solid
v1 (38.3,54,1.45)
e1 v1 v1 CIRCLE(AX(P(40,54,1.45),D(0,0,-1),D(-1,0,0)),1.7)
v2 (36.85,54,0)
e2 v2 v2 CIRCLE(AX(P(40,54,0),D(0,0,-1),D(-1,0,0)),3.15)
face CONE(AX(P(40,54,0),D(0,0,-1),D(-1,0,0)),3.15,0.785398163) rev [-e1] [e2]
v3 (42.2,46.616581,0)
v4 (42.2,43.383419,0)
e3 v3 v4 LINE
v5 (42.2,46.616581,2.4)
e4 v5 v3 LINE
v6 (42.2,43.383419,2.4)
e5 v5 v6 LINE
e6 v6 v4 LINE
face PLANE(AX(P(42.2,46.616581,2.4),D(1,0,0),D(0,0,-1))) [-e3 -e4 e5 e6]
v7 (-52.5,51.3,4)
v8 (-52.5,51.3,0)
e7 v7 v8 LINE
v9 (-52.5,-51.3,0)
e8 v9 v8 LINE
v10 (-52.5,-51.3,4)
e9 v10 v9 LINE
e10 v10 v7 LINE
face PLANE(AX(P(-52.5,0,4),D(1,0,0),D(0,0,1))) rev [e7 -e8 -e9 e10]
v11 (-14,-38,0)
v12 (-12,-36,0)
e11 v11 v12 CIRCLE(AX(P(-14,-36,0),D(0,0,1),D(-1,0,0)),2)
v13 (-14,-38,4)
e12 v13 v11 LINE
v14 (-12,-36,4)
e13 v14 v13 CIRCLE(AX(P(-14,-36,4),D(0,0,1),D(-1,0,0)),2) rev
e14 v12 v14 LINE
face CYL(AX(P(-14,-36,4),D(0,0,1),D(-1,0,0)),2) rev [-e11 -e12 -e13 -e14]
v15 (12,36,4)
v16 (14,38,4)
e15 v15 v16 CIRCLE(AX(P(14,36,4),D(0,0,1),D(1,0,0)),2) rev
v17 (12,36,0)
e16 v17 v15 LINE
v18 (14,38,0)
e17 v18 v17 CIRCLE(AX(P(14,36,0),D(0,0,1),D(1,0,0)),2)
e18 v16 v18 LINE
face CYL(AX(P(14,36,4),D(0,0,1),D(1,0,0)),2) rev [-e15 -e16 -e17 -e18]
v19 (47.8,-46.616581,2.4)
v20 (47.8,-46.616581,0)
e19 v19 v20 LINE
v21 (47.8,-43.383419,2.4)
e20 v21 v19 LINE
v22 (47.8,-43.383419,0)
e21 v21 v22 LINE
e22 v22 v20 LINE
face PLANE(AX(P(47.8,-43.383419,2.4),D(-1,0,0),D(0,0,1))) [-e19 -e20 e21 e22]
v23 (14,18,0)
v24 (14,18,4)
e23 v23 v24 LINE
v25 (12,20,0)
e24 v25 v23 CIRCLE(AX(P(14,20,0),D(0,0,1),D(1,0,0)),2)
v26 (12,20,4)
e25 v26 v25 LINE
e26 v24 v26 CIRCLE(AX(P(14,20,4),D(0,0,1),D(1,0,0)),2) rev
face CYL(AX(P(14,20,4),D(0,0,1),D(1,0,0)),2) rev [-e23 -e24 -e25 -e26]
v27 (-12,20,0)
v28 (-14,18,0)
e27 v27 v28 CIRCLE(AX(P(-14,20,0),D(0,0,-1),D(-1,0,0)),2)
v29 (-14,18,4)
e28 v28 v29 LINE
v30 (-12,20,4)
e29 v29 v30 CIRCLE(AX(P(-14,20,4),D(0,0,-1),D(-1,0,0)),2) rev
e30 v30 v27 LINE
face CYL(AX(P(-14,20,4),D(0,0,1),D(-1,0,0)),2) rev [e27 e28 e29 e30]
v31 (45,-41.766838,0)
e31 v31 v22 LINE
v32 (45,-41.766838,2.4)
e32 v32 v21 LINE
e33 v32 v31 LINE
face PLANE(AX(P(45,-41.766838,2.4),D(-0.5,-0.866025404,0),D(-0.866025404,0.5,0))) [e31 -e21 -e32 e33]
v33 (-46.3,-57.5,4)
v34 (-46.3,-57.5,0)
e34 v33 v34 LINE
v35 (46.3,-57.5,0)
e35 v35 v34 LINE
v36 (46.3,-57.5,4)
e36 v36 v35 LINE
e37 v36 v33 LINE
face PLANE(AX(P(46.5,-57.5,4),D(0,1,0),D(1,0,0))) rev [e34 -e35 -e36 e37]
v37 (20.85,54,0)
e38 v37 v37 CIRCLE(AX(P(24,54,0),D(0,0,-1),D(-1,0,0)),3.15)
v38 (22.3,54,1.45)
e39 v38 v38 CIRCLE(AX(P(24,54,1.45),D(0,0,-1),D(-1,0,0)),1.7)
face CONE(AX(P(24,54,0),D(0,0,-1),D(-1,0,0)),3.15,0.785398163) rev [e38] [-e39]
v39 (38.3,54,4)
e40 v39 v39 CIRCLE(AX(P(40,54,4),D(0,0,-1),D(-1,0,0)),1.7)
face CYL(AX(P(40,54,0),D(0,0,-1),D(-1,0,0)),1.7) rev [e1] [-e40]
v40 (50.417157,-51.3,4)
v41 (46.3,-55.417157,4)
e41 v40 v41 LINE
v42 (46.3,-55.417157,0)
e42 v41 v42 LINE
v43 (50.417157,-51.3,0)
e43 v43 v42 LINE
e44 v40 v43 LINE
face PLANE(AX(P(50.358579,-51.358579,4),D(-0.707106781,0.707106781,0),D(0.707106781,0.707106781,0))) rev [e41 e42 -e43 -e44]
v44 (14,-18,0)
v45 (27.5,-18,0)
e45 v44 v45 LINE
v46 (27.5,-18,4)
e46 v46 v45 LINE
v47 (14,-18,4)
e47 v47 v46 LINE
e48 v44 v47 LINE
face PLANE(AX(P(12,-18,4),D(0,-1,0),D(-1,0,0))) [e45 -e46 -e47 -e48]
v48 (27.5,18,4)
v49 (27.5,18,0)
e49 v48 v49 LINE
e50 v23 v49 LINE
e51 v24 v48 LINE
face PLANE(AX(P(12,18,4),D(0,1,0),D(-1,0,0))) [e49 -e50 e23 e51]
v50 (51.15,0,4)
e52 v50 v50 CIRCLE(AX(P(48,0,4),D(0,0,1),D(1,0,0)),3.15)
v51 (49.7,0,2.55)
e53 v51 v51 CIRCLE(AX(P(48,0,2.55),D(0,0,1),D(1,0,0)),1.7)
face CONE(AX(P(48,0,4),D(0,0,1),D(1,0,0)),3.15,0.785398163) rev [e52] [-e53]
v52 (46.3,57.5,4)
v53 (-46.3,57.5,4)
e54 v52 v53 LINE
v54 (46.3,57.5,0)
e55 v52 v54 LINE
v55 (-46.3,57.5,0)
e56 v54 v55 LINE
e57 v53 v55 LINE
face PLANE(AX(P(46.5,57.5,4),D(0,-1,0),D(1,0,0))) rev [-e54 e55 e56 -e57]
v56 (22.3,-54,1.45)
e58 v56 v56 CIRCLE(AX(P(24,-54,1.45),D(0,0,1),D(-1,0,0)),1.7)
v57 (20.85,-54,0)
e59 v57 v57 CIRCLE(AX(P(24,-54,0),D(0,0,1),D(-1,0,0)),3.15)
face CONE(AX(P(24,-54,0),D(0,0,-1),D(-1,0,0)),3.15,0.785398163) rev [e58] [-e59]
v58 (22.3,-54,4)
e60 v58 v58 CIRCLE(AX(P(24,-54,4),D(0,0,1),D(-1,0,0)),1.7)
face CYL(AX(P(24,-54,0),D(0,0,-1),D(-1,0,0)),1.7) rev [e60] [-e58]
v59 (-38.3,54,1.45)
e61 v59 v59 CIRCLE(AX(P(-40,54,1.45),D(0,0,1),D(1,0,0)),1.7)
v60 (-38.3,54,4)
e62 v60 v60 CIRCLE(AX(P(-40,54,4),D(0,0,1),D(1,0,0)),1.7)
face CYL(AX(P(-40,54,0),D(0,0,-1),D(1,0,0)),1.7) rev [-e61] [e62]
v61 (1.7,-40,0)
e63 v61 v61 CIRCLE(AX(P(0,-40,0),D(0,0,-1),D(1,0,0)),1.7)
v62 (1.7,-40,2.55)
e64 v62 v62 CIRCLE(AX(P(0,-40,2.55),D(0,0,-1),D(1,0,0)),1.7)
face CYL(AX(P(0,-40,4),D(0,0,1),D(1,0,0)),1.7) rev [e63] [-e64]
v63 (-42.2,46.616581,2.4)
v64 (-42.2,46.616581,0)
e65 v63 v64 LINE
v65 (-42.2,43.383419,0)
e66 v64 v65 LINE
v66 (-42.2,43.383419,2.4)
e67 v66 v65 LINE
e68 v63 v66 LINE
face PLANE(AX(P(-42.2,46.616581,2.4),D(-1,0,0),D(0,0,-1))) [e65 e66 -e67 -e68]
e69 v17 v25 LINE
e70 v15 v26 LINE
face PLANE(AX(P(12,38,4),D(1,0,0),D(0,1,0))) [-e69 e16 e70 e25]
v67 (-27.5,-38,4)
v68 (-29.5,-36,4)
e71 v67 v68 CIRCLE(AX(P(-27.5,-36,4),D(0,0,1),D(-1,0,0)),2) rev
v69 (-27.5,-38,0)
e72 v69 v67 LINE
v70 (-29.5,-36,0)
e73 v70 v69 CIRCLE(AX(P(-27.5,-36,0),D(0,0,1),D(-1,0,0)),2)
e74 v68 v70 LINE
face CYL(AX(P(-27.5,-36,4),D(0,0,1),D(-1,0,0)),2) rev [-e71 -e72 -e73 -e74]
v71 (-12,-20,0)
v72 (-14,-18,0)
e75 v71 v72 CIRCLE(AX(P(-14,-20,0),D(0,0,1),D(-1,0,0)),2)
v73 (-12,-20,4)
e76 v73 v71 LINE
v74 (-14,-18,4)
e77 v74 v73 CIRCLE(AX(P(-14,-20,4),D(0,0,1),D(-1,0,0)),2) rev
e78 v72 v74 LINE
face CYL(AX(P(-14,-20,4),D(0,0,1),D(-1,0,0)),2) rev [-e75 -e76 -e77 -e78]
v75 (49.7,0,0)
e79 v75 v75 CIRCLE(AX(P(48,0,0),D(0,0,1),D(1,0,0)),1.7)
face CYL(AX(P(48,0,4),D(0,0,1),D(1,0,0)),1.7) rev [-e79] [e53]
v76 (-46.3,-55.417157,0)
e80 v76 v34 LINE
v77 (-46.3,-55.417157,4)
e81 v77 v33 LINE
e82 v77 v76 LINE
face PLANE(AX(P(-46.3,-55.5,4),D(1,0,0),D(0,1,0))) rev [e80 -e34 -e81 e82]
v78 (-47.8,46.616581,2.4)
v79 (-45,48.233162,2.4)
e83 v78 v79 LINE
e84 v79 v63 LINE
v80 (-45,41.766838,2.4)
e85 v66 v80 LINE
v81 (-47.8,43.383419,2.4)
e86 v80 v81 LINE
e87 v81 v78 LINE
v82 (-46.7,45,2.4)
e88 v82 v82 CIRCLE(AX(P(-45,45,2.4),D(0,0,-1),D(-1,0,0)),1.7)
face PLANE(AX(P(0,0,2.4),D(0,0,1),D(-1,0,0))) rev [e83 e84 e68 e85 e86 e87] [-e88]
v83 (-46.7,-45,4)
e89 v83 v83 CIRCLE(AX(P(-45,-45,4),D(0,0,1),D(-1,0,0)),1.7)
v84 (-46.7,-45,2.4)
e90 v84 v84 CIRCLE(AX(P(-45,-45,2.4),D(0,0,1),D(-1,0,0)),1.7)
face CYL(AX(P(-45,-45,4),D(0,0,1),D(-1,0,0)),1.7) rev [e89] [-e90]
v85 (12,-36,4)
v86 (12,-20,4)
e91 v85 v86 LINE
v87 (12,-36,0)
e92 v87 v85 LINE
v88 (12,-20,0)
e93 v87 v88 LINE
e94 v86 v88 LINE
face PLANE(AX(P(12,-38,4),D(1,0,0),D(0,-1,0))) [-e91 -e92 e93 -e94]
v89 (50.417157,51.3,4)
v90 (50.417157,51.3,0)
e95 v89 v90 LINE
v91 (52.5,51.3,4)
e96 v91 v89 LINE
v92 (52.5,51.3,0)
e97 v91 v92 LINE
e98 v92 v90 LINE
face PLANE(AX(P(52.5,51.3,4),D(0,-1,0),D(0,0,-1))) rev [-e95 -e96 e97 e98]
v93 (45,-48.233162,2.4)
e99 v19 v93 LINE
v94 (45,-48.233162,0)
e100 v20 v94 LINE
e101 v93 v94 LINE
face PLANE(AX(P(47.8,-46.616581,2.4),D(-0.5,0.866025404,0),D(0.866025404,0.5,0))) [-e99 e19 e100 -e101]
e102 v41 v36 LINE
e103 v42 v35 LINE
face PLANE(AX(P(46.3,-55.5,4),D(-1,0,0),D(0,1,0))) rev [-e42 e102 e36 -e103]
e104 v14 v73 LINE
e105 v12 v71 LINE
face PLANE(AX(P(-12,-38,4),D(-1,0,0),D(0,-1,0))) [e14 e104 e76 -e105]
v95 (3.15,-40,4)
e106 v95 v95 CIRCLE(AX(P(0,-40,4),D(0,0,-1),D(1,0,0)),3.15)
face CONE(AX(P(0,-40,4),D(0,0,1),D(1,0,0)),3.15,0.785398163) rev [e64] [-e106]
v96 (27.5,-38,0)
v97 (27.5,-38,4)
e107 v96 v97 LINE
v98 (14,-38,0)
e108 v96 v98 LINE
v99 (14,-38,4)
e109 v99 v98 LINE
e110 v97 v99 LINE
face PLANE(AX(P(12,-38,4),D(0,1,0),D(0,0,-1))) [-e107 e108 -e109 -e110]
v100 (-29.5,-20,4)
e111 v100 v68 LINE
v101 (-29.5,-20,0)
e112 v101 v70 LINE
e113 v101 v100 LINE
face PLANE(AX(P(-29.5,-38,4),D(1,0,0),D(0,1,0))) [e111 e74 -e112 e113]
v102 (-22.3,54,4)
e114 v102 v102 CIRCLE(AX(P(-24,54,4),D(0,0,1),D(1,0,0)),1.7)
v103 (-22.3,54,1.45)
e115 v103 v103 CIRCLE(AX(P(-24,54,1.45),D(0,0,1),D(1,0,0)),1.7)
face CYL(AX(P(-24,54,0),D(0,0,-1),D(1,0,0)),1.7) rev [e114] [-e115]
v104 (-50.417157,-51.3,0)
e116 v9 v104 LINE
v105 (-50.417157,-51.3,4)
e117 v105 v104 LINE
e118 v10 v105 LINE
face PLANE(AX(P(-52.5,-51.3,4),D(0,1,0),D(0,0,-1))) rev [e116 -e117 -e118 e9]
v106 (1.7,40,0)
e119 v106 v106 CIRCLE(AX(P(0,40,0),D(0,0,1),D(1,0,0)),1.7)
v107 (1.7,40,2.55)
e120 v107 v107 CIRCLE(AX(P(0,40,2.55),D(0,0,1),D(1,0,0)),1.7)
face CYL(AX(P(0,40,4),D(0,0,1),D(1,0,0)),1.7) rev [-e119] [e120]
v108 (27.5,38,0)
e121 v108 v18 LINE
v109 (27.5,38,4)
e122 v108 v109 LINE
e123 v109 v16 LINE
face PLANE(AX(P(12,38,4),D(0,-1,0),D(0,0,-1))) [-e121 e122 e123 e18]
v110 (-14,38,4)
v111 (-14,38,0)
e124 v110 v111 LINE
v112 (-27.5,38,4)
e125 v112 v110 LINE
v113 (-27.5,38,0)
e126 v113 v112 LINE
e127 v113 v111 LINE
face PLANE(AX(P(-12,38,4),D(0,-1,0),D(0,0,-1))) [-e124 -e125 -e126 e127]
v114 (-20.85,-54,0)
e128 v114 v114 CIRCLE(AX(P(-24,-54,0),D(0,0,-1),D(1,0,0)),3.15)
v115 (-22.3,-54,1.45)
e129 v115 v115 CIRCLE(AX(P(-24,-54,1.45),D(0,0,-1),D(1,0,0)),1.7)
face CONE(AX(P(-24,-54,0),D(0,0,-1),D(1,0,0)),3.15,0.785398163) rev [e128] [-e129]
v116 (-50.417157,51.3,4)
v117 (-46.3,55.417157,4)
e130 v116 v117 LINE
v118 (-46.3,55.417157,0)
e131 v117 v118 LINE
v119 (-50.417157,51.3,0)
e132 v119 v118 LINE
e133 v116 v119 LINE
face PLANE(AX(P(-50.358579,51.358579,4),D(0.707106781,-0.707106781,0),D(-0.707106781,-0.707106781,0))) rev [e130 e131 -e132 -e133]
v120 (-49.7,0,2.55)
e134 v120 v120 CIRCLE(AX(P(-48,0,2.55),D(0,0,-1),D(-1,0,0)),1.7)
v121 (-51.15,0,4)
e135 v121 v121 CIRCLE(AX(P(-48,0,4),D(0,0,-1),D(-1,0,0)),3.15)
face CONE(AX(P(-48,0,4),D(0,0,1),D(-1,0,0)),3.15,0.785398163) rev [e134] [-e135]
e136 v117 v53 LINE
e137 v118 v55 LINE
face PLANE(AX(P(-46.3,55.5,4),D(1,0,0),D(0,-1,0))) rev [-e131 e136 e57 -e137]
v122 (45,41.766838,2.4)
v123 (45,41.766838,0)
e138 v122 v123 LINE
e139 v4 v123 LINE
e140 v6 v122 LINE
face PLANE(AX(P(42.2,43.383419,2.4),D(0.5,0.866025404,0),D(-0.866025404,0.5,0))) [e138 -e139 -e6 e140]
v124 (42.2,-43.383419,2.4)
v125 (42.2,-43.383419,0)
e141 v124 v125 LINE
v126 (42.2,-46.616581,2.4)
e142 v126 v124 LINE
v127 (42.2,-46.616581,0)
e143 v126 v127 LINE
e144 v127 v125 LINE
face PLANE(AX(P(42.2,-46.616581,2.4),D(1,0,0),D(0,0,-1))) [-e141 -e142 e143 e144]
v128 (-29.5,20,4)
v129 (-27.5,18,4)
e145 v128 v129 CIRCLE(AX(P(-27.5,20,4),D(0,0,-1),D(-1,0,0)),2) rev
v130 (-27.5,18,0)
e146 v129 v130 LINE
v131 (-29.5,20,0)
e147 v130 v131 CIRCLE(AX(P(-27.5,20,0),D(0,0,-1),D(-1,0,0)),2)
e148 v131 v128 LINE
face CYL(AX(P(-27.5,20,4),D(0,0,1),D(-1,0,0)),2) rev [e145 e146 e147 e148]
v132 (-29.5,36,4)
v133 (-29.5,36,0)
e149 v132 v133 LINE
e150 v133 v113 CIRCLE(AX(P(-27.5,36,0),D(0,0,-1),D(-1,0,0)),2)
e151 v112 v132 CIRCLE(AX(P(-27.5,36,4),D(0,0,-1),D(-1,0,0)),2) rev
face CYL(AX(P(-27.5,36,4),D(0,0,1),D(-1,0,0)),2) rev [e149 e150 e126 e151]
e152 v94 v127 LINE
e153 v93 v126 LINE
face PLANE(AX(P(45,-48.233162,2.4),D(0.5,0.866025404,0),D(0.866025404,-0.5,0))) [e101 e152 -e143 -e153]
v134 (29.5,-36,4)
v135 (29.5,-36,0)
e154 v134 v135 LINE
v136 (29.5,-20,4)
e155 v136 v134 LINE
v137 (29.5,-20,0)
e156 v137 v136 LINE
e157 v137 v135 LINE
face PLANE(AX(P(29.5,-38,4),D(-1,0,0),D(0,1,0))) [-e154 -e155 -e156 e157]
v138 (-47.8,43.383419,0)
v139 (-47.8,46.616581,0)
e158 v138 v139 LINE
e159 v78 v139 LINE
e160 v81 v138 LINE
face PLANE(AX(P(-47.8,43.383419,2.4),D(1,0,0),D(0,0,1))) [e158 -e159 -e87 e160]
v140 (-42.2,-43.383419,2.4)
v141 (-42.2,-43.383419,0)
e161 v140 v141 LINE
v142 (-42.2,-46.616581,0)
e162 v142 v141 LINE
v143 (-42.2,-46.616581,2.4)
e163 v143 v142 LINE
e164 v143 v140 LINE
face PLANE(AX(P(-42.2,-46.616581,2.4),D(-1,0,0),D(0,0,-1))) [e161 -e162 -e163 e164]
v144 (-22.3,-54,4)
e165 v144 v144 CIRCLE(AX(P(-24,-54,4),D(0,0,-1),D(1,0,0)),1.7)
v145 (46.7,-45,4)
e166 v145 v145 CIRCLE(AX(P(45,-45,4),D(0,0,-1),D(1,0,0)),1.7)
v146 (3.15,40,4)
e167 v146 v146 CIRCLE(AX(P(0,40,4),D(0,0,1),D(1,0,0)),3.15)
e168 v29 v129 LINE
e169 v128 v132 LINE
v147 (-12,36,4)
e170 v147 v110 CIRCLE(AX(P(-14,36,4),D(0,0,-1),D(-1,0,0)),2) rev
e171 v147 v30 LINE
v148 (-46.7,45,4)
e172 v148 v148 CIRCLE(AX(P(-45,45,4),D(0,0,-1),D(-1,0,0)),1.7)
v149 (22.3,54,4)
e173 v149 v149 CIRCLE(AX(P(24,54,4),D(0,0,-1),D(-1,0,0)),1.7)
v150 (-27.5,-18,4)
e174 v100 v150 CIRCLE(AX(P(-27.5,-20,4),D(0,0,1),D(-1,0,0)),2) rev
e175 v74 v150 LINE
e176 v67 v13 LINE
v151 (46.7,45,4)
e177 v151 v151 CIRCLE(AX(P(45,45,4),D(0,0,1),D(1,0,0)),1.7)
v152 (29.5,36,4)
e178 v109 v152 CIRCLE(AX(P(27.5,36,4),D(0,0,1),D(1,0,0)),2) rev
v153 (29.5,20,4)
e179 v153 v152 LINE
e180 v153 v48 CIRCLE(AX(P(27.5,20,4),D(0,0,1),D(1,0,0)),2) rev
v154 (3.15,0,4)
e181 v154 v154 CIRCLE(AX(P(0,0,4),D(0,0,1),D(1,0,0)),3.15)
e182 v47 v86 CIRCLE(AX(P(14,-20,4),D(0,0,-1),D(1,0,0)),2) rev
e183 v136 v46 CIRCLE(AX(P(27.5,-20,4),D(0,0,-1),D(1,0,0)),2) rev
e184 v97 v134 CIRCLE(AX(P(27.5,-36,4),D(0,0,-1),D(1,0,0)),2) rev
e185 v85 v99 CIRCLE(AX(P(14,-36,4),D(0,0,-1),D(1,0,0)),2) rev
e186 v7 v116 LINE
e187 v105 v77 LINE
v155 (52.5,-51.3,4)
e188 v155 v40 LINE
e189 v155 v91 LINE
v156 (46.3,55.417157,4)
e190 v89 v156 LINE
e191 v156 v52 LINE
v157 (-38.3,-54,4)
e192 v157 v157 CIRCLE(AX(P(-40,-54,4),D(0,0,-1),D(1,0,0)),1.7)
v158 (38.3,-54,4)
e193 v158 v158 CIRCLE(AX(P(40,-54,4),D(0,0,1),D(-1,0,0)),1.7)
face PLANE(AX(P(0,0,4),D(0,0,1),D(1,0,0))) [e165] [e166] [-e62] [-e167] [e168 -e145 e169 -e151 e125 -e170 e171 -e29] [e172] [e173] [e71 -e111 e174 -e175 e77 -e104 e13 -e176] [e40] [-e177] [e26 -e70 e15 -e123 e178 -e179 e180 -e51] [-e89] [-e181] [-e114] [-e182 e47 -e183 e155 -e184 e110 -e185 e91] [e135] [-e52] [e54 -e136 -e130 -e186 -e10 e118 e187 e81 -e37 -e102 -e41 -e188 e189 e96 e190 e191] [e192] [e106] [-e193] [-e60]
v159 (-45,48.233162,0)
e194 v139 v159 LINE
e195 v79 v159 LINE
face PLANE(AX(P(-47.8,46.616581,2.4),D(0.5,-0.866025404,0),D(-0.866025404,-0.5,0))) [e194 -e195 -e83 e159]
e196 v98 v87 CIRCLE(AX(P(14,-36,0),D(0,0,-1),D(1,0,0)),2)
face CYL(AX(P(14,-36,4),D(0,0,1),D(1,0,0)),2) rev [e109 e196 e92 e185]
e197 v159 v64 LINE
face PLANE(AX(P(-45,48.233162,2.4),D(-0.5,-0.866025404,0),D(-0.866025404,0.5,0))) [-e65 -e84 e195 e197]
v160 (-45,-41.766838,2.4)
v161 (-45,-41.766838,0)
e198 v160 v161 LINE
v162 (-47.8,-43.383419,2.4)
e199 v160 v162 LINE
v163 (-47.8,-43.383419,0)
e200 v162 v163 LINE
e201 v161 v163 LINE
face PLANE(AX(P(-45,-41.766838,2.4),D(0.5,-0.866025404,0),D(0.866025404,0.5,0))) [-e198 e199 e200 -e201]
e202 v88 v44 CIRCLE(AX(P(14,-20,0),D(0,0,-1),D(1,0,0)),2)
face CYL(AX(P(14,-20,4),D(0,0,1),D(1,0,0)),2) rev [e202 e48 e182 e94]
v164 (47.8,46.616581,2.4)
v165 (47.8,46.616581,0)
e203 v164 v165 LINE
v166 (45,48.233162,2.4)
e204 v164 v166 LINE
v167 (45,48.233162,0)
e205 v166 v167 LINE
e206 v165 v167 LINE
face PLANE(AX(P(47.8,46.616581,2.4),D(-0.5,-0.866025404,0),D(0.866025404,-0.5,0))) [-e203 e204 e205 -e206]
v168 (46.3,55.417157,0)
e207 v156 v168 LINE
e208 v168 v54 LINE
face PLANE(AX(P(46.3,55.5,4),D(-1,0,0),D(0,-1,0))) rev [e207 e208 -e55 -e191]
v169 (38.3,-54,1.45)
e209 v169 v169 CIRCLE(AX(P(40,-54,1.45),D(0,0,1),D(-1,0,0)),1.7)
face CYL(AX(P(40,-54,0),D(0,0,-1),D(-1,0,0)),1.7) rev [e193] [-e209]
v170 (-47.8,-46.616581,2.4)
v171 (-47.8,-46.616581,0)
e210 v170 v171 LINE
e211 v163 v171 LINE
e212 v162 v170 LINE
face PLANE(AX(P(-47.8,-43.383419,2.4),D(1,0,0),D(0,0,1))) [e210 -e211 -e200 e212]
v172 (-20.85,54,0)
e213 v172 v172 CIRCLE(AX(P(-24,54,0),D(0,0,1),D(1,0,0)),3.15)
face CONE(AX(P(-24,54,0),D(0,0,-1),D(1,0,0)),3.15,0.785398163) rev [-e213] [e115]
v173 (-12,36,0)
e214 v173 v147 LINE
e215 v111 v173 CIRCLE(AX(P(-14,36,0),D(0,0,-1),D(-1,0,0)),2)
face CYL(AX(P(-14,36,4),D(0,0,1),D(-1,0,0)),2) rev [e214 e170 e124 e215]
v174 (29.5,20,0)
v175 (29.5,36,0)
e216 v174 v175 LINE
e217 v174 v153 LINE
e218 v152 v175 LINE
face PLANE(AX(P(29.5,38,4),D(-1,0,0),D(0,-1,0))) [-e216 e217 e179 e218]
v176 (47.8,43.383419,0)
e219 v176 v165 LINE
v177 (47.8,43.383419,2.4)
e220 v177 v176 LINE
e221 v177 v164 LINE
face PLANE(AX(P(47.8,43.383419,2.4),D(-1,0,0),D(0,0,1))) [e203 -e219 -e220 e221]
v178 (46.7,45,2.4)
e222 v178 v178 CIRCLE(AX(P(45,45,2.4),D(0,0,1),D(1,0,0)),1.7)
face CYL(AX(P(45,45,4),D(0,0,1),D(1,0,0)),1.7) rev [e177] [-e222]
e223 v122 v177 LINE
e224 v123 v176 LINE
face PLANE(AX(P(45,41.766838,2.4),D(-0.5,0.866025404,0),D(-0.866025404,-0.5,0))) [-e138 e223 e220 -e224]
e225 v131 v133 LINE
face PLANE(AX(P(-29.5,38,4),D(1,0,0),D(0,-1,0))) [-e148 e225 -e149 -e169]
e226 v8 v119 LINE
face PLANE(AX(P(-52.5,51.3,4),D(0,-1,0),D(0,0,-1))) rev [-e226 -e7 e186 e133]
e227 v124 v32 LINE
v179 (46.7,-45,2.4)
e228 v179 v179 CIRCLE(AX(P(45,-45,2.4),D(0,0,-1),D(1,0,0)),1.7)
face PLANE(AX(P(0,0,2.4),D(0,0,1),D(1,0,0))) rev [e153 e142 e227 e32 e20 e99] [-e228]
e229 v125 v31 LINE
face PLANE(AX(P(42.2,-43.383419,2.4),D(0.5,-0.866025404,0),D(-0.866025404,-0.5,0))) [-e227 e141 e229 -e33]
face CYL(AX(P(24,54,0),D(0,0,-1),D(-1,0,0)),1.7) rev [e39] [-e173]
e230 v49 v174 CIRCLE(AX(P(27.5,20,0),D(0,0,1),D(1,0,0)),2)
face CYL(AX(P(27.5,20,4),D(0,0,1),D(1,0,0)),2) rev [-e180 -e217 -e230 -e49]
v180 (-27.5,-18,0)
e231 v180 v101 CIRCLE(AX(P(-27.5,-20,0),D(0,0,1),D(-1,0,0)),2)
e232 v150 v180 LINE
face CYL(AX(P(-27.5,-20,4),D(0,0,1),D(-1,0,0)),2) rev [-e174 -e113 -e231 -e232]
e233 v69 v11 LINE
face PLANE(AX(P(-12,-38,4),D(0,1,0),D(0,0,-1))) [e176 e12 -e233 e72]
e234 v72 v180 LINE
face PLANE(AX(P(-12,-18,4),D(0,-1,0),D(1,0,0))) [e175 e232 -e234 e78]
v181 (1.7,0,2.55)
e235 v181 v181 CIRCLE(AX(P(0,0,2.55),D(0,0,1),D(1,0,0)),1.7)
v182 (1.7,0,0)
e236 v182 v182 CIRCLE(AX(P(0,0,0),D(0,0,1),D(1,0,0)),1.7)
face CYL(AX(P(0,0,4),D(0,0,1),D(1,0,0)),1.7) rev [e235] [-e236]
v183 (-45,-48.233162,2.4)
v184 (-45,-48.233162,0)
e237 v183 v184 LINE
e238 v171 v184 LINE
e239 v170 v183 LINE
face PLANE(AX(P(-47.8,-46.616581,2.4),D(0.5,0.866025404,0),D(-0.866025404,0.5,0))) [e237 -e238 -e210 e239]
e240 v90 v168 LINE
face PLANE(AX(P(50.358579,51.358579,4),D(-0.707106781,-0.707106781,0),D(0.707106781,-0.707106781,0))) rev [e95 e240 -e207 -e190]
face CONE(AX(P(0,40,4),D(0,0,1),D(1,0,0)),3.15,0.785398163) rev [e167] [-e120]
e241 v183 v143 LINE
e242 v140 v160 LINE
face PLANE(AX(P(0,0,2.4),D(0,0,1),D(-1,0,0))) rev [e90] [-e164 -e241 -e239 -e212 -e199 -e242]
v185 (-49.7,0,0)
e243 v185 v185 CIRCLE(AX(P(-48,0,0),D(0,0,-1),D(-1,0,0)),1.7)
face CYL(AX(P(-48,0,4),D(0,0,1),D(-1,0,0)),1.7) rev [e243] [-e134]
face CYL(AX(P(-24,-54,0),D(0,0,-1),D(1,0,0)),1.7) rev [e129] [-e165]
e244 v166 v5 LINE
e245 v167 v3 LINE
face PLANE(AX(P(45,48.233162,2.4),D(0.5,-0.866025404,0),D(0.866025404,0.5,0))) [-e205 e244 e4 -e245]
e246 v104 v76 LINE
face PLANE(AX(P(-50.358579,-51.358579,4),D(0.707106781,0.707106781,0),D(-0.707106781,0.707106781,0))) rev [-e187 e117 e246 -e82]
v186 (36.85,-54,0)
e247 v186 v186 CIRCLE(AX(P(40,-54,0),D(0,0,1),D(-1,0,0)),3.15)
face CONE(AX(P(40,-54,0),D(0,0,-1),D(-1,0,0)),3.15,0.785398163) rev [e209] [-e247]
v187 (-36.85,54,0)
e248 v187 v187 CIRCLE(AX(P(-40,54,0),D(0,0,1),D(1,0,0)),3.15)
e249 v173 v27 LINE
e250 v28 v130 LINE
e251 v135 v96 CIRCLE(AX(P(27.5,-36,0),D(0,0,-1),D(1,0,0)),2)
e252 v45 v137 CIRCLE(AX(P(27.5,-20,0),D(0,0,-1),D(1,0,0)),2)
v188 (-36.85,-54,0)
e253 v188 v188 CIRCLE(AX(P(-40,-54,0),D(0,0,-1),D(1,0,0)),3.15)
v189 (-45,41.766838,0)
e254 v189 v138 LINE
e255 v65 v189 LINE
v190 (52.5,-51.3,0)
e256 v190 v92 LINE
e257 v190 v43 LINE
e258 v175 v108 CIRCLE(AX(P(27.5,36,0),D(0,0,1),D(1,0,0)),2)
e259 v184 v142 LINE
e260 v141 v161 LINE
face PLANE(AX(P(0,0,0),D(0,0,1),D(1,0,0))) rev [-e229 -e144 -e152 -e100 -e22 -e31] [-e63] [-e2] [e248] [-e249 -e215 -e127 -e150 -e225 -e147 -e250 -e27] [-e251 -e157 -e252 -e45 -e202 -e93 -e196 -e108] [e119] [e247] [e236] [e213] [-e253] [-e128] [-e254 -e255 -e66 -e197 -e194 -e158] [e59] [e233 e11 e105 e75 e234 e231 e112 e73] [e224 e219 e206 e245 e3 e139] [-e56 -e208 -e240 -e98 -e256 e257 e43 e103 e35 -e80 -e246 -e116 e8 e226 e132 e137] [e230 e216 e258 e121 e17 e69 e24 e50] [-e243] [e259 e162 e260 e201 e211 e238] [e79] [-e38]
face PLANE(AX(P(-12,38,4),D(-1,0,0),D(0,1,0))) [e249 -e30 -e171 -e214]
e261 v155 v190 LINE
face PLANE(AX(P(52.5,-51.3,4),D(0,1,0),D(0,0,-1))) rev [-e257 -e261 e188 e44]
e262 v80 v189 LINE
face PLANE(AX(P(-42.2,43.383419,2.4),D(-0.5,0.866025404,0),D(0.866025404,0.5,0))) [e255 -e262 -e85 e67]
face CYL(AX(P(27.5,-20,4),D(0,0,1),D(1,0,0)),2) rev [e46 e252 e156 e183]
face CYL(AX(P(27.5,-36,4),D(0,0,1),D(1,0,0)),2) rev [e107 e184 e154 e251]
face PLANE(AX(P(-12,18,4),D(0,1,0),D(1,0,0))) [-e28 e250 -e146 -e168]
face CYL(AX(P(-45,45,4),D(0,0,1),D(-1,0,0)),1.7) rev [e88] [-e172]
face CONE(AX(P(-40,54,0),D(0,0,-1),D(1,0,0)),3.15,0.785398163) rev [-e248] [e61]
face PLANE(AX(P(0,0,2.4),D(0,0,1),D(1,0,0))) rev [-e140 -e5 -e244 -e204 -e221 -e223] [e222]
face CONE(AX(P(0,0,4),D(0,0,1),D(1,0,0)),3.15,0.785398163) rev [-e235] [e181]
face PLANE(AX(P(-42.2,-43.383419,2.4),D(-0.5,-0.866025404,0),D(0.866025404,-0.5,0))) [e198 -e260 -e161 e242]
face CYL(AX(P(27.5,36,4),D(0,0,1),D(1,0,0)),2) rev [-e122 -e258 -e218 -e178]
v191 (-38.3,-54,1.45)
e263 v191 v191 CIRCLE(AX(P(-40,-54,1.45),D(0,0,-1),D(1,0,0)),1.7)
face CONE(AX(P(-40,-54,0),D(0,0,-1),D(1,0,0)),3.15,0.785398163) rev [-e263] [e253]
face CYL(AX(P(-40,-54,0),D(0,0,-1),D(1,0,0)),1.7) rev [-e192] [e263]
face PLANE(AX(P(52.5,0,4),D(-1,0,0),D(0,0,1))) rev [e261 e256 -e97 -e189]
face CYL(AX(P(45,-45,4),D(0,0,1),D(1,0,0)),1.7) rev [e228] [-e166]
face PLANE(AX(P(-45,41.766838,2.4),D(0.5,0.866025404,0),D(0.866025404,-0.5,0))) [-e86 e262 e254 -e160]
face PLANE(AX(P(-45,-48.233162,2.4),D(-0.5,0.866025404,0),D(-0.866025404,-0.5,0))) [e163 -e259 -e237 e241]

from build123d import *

# Parameters (mm, degrees)
BOSS_EXTRUDE1_DEPTH                             = 4
CUT_EXTRUDE4_DEPTH                              = 2.4
M3_CLEARANCE_HOLE1_D                            = 3.4
CSK_FOR_M3_FLAT_HEAD_MACHINE_SCREW1_D           = 3.4
CSK_FOR_M3_FLAT_HEAD_MACHINE_SCREW1_CSINK_D     = 6.3
CSK_FOR_M3_FLAT_HEAD_MACHINE_SCREW1_CSINK_ANGLE = 90
SKETCH11_W                                      = 17.5
SKETCH11_H                                      = 20
CUT_EXTRUDE3_DEPTH                              = 78.964735618
FILLET1_R                                       = 2
CSK_FOR_M3_FLAT_HEAD_MACHINE_SCREW2_D           = 3.4
CSK_FOR_M3_FLAT_HEAD_MACHINE_SCREW2_CSINK_D     = 6.3
CSK_FOR_M3_FLAT_HEAD_MACHINE_SCREW2_CSINK_ANGLE = 90
MOVE_FACE1_DEPTH                                = 4


# Read off the part's stored shape, not the designer's step: Move Face1
with BuildPart() as part:
    # Sketch2 → Boss-Extrude1 (new body)
    with BuildSketch(Plane.XY):
        Polygon((0, 57.5), (0, 0), (52.5, 0), (52.5, 51.5), (50.5, 51.5), (46.5, 55.5), (46.5, 57.5), align=None)
    extrude(amount=BOSS_EXTRUDE1_DEPTH)

    # Sketch12 → Cut-Extrude4 (cut)
    with BuildSketch(Plane.XY):
        Polygon((45, 41.766838493), (47.8, 43.383419246), (47.8, 46.616580754), (45, 48.233161507), (42.2, 46.616580754), (42.2, 43.383419246), align=None)
    extrude(amount=CUT_EXTRUDE4_DEPTH, mode=Mode.SUBTRACT)

    # M3 Clearance Hole1 (through all)
    with Locations(Plane.XY.offset(4)):
        with Locations((45, 45), (-45, 45), (-45, -45), (45, -45)):
            Hole(M3_CLEARANCE_HOLE1_D / 2)

    # CSK for M3 Flat Head Machine Screw1 (through all)
    with Locations(Plane.XY.offset(4)):
        with Locations((0, 40), (0, 0), (48, 0)):
            CounterSinkHole(CSK_FOR_M3_FLAT_HEAD_MACHINE_SCREW1_D / 2, CSK_FOR_M3_FLAT_HEAD_MACHINE_SCREW1_CSINK_D / 2, counter_sink_angle=CSK_FOR_M3_FLAT_HEAD_MACHINE_SCREW1_CSINK_ANGLE)

    # Sketch11 → Cut-Extrude3 (cut, through all)
    with BuildSketch(Plane.XY):
        with Locations((20.75, 28)):
            Rectangle(SKETCH11_W, SKETCH11_H)
    extrude(amount=CUT_EXTRUDE3_DEPTH, mode=Mode.SUBTRACT)

    # Fillet1
    fillet1_edges = [part.edges().sort_by_distance(p)[0] for p in [
        (29.5, 38, 2),
        (12, 38, 2),
        (12, 18, 2),
        (29.5, 18, 2),
    ]]
    fillet(fillet1_edges, radius=FILLET1_R)

    # CSK for M3 Flat Head Machine Screw2 (through all)
    with Locations(Plane(origin=(0, 0, 0), x_dir=(-1, 0, 0), z_dir=(0, 0, -1))):
        with Locations((-24, 54), (-40, 54)):
            CounterSinkHole(CSK_FOR_M3_FLAT_HEAD_MACHINE_SCREW2_D / 2, CSK_FOR_M3_FLAT_HEAD_MACHINE_SCREW2_CSINK_D / 2, counter_sink_angle=CSK_FOR_M3_FLAT_HEAD_MACHINE_SCREW2_CSINK_ANGLE)

    # Move Face1 outline → Move Face1 (cut)
    with BuildSketch(Plane.XY):
        Polygon((46.3, 55.417157288), (50.417157288, 51.3), (52.5, 51.3), (52.5, 51.5), (50.5, 51.5), (46.5, 55.5), (46.5, 57.5), (46.3, 57.5), align=None)
    extrude(amount=MOVE_FACE1_DEPTH, mode=Mode.SUBTRACT)

    # Mirror1: part across plane


with BuildPart() as part_1:
    add(part.part)
    add(part.part.mirror(Plane(origin=(0, 0, 0), x_dir=(0, 0, 1), z_dir=(0, -1, 0))))

    # Mirror2: part across plane


with BuildPart() as part_2:
    add(part_1.part)
    add(part_1.part.mirror(Plane(origin=(0, 0, 0), x_dir=(0, 0, 1), z_dir=(1, 0, 0))))


solid = part_2.part
